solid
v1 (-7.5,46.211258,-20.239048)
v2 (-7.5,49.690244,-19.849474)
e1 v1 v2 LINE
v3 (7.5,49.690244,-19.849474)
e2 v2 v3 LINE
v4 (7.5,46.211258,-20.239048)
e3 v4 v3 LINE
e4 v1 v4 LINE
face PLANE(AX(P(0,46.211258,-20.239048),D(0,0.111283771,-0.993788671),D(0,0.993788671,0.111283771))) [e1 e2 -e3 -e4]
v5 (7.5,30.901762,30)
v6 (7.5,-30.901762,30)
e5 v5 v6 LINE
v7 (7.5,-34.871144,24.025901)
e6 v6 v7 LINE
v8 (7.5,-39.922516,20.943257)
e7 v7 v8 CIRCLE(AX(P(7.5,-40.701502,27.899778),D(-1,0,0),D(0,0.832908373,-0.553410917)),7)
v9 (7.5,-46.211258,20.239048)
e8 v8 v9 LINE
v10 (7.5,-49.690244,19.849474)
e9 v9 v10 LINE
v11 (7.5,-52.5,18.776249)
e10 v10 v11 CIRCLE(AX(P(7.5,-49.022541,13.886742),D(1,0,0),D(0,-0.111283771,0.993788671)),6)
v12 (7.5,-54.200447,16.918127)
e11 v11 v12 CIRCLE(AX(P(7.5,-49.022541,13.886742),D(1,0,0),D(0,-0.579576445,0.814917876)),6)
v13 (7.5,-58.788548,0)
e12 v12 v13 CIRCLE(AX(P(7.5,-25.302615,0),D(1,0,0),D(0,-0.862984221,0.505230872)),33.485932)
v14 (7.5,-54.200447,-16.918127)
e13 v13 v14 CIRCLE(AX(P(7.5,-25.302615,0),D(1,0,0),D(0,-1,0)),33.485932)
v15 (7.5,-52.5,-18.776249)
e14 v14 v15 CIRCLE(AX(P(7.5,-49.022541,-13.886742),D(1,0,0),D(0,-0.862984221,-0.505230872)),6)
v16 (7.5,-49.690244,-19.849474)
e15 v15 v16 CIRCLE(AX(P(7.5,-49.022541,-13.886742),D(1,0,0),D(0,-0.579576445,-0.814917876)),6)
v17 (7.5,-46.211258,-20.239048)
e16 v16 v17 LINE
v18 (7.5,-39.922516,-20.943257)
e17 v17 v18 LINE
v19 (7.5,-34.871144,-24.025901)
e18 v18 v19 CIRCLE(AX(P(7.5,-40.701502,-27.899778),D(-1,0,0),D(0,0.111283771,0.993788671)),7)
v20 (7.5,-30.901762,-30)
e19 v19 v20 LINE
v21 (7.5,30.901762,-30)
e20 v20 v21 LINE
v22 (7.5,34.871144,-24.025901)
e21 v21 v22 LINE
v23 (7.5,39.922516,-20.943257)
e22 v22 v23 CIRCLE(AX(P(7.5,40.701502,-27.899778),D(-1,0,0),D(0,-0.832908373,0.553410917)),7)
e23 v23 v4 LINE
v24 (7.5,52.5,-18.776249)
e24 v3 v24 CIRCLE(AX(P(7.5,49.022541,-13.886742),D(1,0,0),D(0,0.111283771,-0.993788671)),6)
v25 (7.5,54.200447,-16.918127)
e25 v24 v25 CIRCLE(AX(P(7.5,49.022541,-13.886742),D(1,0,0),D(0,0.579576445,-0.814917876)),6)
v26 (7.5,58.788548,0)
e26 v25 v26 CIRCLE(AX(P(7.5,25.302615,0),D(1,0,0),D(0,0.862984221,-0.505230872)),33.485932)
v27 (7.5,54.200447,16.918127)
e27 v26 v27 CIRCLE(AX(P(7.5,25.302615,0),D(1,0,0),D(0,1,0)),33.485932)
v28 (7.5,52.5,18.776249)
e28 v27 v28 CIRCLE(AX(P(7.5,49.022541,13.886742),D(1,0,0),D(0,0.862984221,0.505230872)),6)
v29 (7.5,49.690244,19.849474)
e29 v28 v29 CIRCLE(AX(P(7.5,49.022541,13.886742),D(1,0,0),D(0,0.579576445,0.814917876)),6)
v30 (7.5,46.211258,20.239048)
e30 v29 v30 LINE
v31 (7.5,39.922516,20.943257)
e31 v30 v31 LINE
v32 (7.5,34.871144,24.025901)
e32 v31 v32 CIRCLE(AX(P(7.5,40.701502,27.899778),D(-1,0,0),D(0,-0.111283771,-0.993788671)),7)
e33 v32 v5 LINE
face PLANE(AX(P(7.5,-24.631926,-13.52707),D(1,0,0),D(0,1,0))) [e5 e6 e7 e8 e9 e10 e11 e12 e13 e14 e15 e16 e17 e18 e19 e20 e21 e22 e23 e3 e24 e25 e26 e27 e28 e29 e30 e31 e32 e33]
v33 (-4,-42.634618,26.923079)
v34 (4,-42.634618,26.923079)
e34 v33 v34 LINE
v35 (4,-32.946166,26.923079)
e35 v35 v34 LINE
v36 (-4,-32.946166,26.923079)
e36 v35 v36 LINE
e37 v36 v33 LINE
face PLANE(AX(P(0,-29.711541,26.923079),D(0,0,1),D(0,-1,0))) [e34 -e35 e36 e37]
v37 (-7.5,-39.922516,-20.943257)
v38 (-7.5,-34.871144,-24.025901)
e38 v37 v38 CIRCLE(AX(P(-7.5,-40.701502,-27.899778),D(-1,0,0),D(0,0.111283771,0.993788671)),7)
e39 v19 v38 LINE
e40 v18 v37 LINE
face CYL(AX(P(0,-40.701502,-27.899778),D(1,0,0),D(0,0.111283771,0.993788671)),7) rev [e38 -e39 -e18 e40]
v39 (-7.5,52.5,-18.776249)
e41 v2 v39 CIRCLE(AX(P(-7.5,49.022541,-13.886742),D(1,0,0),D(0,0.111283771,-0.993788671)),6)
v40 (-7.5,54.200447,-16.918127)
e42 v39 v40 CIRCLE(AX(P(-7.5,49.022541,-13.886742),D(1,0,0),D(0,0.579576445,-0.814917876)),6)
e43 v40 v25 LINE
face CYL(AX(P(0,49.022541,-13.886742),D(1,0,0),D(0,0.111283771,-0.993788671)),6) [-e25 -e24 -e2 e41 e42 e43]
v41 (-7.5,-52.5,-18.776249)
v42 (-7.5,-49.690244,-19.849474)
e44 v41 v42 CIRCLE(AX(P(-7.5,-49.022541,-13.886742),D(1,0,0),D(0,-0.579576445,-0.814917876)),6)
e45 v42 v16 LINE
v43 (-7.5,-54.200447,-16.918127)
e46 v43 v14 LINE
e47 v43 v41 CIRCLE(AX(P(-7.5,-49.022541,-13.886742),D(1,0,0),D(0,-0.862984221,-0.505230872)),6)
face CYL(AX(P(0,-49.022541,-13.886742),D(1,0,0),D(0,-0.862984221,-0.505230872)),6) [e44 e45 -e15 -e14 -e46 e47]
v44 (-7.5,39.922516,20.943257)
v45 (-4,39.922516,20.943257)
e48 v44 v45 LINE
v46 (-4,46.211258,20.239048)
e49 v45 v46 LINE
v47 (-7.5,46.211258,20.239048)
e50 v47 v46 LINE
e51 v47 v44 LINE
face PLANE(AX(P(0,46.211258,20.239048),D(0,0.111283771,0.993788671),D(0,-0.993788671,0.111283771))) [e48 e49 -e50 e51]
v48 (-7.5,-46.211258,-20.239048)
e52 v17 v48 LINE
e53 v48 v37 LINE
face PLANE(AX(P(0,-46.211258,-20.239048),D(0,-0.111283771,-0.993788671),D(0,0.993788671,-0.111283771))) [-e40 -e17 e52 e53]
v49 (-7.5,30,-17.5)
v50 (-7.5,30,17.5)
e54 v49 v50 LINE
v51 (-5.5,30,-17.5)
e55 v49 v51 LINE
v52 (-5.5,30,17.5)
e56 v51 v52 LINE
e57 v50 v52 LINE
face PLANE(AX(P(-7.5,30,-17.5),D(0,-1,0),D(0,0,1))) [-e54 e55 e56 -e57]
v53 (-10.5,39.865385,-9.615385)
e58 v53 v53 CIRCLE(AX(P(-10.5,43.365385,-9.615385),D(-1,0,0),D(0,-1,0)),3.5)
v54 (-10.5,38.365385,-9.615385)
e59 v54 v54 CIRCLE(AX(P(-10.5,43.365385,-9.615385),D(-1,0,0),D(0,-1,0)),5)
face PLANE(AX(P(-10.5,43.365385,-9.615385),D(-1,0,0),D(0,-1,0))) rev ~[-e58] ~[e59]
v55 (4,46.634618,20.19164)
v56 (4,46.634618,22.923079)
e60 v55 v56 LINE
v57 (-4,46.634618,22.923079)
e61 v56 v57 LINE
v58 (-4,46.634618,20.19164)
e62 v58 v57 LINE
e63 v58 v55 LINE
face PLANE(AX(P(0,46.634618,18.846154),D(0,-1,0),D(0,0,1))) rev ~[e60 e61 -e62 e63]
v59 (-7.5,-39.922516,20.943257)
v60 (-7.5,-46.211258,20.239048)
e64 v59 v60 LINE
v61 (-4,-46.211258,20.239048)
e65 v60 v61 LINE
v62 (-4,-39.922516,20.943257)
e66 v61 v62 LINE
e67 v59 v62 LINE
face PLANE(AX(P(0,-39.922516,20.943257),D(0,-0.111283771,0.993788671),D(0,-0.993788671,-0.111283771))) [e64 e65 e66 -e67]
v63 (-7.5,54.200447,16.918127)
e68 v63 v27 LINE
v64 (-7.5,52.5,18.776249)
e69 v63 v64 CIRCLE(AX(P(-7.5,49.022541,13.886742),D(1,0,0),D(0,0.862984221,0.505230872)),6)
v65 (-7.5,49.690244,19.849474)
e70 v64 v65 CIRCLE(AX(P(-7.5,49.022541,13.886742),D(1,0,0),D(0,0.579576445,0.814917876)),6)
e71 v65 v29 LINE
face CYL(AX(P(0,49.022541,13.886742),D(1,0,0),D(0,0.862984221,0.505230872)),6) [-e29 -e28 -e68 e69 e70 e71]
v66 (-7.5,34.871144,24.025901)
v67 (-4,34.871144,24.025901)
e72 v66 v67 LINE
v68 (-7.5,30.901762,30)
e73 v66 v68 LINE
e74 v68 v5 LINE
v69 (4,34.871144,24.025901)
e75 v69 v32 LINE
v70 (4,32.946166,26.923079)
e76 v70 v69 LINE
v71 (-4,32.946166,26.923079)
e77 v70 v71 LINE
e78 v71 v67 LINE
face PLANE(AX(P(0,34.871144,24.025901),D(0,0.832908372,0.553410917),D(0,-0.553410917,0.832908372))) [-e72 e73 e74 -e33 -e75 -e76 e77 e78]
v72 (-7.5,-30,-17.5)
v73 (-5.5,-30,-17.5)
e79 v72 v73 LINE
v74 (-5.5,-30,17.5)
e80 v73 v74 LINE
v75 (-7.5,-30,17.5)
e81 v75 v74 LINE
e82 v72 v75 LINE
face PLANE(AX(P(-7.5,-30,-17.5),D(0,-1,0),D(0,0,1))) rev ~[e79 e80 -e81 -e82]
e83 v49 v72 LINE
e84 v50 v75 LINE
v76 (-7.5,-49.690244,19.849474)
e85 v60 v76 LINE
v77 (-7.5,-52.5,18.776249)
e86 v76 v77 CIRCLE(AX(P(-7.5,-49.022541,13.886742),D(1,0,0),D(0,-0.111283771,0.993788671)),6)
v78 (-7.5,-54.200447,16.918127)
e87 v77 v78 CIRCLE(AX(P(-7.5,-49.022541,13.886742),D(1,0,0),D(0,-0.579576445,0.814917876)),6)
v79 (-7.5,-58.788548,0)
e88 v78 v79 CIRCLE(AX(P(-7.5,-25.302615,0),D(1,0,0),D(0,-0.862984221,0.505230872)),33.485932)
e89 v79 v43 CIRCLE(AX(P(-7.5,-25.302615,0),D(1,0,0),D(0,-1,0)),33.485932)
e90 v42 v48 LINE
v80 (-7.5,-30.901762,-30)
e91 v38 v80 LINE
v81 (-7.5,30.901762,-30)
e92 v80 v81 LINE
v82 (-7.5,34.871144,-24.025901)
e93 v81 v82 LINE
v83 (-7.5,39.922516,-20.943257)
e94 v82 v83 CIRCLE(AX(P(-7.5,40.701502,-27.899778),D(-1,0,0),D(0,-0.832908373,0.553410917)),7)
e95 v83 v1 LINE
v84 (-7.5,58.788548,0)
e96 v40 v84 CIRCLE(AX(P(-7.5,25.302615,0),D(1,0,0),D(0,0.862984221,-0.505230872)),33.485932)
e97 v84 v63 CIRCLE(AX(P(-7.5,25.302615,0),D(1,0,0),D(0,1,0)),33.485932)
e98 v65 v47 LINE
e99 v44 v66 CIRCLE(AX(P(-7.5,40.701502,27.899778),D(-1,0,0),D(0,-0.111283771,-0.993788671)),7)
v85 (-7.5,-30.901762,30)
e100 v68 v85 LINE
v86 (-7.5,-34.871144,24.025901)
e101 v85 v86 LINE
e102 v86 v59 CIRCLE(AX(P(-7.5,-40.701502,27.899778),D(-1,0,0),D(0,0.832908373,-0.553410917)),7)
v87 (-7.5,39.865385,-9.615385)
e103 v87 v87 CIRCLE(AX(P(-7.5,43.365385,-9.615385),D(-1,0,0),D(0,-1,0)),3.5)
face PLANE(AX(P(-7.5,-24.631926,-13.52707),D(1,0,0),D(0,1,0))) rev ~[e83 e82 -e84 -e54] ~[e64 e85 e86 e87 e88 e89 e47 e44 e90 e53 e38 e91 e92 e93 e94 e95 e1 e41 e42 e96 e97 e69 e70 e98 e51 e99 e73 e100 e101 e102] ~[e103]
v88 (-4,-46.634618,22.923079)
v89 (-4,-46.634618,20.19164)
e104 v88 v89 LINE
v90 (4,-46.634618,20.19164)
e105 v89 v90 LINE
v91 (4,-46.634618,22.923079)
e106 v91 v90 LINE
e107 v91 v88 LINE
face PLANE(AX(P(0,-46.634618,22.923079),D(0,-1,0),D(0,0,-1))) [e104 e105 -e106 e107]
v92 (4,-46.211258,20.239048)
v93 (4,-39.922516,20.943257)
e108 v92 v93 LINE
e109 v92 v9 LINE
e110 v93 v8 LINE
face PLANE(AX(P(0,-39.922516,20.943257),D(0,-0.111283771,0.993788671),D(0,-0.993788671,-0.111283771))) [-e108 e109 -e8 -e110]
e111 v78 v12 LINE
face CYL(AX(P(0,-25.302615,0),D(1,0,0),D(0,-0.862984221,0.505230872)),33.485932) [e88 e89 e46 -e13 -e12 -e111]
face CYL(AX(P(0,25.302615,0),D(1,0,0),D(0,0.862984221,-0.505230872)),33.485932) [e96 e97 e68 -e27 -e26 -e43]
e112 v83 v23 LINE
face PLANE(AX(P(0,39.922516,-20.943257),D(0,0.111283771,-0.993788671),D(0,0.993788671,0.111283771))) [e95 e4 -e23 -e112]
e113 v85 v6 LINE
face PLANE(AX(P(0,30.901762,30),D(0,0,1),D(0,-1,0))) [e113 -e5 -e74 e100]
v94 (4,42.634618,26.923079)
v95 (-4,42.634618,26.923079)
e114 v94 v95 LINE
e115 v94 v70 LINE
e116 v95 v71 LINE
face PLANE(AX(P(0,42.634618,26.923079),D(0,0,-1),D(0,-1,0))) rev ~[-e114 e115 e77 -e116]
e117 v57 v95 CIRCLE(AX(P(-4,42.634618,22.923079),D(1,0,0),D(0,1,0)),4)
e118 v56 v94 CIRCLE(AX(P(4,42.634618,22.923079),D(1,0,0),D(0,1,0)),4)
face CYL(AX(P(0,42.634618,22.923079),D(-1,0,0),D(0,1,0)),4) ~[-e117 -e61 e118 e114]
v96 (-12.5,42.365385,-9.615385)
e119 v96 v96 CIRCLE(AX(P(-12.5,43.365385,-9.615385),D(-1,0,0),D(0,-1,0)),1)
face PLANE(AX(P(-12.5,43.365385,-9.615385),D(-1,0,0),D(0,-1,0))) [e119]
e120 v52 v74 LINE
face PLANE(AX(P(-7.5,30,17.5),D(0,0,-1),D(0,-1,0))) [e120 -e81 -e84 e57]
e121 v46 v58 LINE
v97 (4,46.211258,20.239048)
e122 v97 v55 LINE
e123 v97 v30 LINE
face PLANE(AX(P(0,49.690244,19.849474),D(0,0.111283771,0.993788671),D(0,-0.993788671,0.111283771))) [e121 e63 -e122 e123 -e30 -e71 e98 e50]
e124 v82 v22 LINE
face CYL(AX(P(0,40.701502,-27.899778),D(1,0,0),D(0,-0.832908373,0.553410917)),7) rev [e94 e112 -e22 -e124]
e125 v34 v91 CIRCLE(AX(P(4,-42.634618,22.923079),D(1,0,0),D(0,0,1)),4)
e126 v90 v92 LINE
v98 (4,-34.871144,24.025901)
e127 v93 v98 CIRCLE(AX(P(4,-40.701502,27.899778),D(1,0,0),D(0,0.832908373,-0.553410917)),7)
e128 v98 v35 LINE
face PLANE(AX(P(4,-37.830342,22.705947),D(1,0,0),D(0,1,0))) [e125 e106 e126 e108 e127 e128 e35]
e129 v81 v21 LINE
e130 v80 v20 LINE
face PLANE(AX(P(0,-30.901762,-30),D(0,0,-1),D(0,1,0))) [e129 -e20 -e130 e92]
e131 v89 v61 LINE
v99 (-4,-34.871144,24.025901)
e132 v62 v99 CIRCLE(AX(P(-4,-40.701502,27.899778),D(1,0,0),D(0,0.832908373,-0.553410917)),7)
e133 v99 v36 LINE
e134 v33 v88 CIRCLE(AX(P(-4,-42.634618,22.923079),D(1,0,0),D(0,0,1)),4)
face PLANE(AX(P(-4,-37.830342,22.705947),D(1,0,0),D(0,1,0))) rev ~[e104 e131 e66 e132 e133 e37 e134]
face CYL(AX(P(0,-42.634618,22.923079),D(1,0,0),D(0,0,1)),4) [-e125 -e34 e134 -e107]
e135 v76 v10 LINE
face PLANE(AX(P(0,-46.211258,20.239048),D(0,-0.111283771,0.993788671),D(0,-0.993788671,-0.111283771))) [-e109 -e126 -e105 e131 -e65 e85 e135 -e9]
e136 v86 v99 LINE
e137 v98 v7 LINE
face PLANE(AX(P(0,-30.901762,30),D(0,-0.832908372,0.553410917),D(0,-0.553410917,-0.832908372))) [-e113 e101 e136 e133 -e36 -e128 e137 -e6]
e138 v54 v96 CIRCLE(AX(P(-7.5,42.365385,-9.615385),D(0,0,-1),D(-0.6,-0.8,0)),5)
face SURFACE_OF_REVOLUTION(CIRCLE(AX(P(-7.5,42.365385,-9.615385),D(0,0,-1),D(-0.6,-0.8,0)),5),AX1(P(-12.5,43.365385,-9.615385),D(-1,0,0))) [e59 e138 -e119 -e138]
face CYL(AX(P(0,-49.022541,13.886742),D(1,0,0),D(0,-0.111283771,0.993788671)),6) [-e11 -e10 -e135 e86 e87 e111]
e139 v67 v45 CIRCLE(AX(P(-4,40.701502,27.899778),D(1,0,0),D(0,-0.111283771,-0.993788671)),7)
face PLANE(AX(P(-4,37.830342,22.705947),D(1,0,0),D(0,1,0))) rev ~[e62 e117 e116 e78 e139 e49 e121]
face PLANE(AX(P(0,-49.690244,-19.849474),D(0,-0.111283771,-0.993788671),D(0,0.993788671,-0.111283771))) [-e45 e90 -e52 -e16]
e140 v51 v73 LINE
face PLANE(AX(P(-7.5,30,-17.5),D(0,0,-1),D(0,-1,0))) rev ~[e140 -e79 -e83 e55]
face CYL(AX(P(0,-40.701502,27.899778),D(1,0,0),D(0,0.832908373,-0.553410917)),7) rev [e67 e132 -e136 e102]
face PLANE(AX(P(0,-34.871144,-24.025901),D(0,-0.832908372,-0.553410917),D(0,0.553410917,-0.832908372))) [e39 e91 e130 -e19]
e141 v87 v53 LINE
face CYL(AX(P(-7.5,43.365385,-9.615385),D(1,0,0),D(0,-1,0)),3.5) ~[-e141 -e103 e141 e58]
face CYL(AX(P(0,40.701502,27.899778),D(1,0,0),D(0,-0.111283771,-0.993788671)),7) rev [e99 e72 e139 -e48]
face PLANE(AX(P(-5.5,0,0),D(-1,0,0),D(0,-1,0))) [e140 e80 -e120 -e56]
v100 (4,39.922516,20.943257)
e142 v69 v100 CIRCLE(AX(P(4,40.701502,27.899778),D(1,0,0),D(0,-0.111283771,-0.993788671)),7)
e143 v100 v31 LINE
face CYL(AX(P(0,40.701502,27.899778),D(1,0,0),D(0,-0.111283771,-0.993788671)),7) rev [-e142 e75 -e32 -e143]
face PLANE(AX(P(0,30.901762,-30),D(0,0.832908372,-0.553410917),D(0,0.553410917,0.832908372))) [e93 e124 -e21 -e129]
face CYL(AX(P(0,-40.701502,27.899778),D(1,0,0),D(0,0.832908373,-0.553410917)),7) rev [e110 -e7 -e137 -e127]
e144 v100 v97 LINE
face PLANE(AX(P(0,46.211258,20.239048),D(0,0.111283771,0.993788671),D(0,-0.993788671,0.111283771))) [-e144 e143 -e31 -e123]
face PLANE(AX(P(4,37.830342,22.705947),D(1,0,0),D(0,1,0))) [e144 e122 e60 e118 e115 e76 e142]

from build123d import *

# Parameters (mm, degrees)
F1_DEPTH  = 7.5
F3_DEPTH  = 4
F5_R      = 3.5
F6_DEPTH  = 3
F7_R      = 5
F8_DEPTH  = 2
F4_W      = 60
F4_H      = 35
F10_DEPTH = 2


# Not quite as in the source:
# - a fillet or chamfer that OpenCascade refuses, or shapes differently, is made with other operations: its cross-section is extruded or revolved along the edge and cut away or added


with BuildPart() as f1:
    # F0 (on Right) → F1 (new body, symmetric)
    with BuildSketch(Plane.YZ):
        with BuildLine():
            Line((-34.8711436077, -24.0259013658), (-30.9017617255, -30))
            Line((-30.9017617255, -30), (0, -30))
            Line((0, -30), (0, 0))
            Line((0, 0), (-52.5, 0))
            Line((-52.5, 0), (-52.5, -18.7762488504))
            ThreePointArc((-52.5, -18.7762488504), (-51.1634624835, -19.4917800985), (-49.6902439515, -19.8494736223))
            Line((-49.6902439515, -19.8494736223), (-46.2112579103, -20.2390480822))
            Line((-46.2112579103, -20.2390480822), (-39.9225158206, -20.9432570884))
            ThreePointArc((-39.9225158206, -20.9432570884), (-37.0550608987, -21.9245400717), (-34.8711436077, -24.0259013658))
        make_face()
        with BuildLine():
            Line((0, 0), (0, -30))
            Line((0, -30), (30.9017617255, -30))
            Line((30.9017617255, -30), (34.8711436077, -24.0259013658))
            ThreePointArc((34.8711436077, -24.0259013658), (37.0550608987, -21.9245400717), (39.9225158206, -20.9432570884))
            Line((39.9225158206, -20.9432570884), (46.2112579103, -20.2390480822))
            Line((46.2112579103, -20.2390480822), (49.6902439515, -19.8494736223))
            ThreePointArc((49.6902439515, -19.8494736223), (51.1634624835, -19.4917800985), (52.5, -18.7762488504))
            Line((52.5, -18.7762488504), (52.5, 0))
            Line((52.5, 0), (0, 0))
        make_face()
        with BuildLine():
            Line((-52.5, 0), (0, 0))
            Line((0, 0), (0, 30))
            Line((0, 30), (-30.9017617255, 30))
            Line((-30.9017617255, 30), (-34.8711436077, 24.0259013658))
            ThreePointArc((-34.8711436077, 24.0259013658), (-37.0550608987, 21.9245400717), (-39.9225158206, 20.9432570884))
            Line((-39.9225158206, 20.9432570884), (-46.2112579103, 20.2390480822))
            Line((-46.2112579103, 20.2390480822), (-49.6902439515, 19.8494736223))
            ThreePointArc((-49.6902439515, 19.8494736223), (-51.1634624835, 19.4917800985), (-52.5, 18.7762488504))
            Line((-52.5, 18.7762488504), (-52.5, 0))
        make_face()
        with BuildLine():
            Line((0, 30), (0, 0))
            Line((0, 0), (52.5, 0))
            Line((52.5, 0), (52.5, 18.7762488504))
            ThreePointArc((52.5, 18.7762488504), (51.1634624835, 19.4917800985), (49.6902439515, 19.8494736223))
            Line((49.6902439515, 19.8494736223), (46.2112579103, 20.2390480822))
            Line((46.2112579103, 20.2390480822), (39.9225158206, 20.9432570884))
            ThreePointArc((39.9225158206, 20.9432570884), (37.0550608987, 21.9245400717), (34.8711436077, 24.0259013658))
            Line((34.8711436077, 24.0259013658), (30.9017617255, 30))
            Line((30.9017617255, 30), (0, 30))
        make_face()
        with BuildLine():
            Line((58.7885477615, 0), (52.5, 0))
            Line((52.5, 0), (52.5, -18.7762488504))
            ThreePointArc((52.5, -18.7762488504), (53.448824854, -17.9374222983), (54.2004466552, -16.9181268278))
            ThreePointArc((54.2004466552, -16.9181268278), (57.6211742241, -8.7646119013), (58.7885477615, 0))
        make_face()
        with BuildLine():
            Line((52.5, 18.7762488504), (52.5, 0))
            Line((52.5, 0), (58.7885477615, 0))
            ThreePointArc((58.7885477615, 0), (57.6211742241, 8.7646119013), (54.2004466552, 16.9181268278))
            ThreePointArc((54.2004466552, 16.9181268278), (53.448824854, 17.9374222983), (52.5, 18.7762488504))
        make_face()
        with BuildLine():
            Line((-58.7885477615, 0), (-52.5, 0))
            Line((-52.5, 0), (-52.5, 18.7762488504))
            ThreePointArc((-52.5, 18.7762488504), (-53.448824854, 17.9374222983), (-54.2004466552, 16.9181268278))
            ThreePointArc((-54.2004466552, 16.9181268278), (-57.6211742241, 8.7646119013), (-58.7885477615, 0))
        make_face()
        with BuildLine():
            Line((-52.5, -18.7762488504), (-52.5, 0))
            Line((-52.5, 0), (-58.7885477615, 0))
            ThreePointArc((-58.7885477615, 0), (-57.6211742241, -8.7646119013), (-54.2004466552, -16.9181268278))
            ThreePointArc((-54.2004466552, -16.9181268278), (-53.448824854, -17.9374222983), (-52.5, -18.7762488504))
        make_face()
    extrude(amount=F1_DEPTH, both=True)

    # F2 (on Right) → F3 (join, symmetric)
    with BuildSketch(Plane.YZ):
        with BuildLine():
            Line((29.7115407884, 26.9230790436), (29.7115407884, 18.846154213))
            Line((29.7115407884, 18.846154213), (46.6346181929, 18.846154213))
            Line((46.6346181929, 18.846154213), (46.6346181929, 22.9230790436))
            ThreePointArc((46.6346181929, 22.9230790436), (45.4630453177, 25.7515061684), (42.6346181929, 26.9230790436))
            Line((42.6346181929, 26.9230790436), (29.7115407884, 26.9230790436))
        make_face()
        with BuildLine():
            Line((-29.7115407884, 18.846154213), (-29.7115407884, 26.9230790436))
            Line((-29.7115407884, 26.9230790436), (-42.6346181929, 26.9230790436))
            ThreePointArc((-42.6346181929, 26.9230790436), (-45.4630453177, 25.7515061684), (-46.6346181929, 22.9230790436))
            Line((-46.6346181929, 22.9230790436), (-46.6346181929, 18.846154213))
            Line((-46.6346181929, 18.846154213), (-29.7115407884, 18.846154213))
        make_face()
    extrude(amount=F3_DEPTH, both=True)

    # F5 (on face) → F6 (join)
    with BuildSketch(Plane(origin=(-7.5, 0, 0), x_dir=(0, -1, 0), z_dir=(-1, 0, 0))):
        with Locations((-43.3653853834, -9.6153849736)):
            Circle(F5_R)
    extrude(amount=F6_DEPTH)

    # F7 (on face) → F8 (join)
    with BuildSketch(Plane(origin=(-10.5, 0, 0), x_dir=(0, -1, 0), z_dir=(-1, 0, 0))):
        with Locations((-43.3653853834, -9.6153849736)):
            Circle(F7_R)
    extrude(amount=F8_DEPTH)

    # F9: fillet of radius 5 on 1 edges, made by hand

    # F9_s1 → F9_t2 (revolve, cut)
    with BuildSketch(Plane.XY.offset(-9.6153849736)):
        with BuildLine():
            ThreePointArc((-10.5, 38.3653853834), (-11.972135955, 40.1293174059), (-12.5, 42.3653853834))
            Line((-12.5, 42.3653853834), (-12.5, 38.3653853834))
            Line((-12.5, 38.3653853834), (-10.5, 38.3653853834))
        make_face()
    revolve(axis=Axis((-12.5, 43.3653853834, -9.6153849736), (-1, 0, 0)), mode=Mode.SUBTRACT)

    # F4 (on face) → F10 (cut)
    with BuildSketch(Plane(origin=(-7.5, 0, 0), x_dir=(0, -1, 0), z_dir=(-1, 0, 0))):
        Rectangle(F4_W, F4_H)
    extrude(amount=-F10_DEPTH, mode=Mode.SUBTRACT)


solid = f1.part
